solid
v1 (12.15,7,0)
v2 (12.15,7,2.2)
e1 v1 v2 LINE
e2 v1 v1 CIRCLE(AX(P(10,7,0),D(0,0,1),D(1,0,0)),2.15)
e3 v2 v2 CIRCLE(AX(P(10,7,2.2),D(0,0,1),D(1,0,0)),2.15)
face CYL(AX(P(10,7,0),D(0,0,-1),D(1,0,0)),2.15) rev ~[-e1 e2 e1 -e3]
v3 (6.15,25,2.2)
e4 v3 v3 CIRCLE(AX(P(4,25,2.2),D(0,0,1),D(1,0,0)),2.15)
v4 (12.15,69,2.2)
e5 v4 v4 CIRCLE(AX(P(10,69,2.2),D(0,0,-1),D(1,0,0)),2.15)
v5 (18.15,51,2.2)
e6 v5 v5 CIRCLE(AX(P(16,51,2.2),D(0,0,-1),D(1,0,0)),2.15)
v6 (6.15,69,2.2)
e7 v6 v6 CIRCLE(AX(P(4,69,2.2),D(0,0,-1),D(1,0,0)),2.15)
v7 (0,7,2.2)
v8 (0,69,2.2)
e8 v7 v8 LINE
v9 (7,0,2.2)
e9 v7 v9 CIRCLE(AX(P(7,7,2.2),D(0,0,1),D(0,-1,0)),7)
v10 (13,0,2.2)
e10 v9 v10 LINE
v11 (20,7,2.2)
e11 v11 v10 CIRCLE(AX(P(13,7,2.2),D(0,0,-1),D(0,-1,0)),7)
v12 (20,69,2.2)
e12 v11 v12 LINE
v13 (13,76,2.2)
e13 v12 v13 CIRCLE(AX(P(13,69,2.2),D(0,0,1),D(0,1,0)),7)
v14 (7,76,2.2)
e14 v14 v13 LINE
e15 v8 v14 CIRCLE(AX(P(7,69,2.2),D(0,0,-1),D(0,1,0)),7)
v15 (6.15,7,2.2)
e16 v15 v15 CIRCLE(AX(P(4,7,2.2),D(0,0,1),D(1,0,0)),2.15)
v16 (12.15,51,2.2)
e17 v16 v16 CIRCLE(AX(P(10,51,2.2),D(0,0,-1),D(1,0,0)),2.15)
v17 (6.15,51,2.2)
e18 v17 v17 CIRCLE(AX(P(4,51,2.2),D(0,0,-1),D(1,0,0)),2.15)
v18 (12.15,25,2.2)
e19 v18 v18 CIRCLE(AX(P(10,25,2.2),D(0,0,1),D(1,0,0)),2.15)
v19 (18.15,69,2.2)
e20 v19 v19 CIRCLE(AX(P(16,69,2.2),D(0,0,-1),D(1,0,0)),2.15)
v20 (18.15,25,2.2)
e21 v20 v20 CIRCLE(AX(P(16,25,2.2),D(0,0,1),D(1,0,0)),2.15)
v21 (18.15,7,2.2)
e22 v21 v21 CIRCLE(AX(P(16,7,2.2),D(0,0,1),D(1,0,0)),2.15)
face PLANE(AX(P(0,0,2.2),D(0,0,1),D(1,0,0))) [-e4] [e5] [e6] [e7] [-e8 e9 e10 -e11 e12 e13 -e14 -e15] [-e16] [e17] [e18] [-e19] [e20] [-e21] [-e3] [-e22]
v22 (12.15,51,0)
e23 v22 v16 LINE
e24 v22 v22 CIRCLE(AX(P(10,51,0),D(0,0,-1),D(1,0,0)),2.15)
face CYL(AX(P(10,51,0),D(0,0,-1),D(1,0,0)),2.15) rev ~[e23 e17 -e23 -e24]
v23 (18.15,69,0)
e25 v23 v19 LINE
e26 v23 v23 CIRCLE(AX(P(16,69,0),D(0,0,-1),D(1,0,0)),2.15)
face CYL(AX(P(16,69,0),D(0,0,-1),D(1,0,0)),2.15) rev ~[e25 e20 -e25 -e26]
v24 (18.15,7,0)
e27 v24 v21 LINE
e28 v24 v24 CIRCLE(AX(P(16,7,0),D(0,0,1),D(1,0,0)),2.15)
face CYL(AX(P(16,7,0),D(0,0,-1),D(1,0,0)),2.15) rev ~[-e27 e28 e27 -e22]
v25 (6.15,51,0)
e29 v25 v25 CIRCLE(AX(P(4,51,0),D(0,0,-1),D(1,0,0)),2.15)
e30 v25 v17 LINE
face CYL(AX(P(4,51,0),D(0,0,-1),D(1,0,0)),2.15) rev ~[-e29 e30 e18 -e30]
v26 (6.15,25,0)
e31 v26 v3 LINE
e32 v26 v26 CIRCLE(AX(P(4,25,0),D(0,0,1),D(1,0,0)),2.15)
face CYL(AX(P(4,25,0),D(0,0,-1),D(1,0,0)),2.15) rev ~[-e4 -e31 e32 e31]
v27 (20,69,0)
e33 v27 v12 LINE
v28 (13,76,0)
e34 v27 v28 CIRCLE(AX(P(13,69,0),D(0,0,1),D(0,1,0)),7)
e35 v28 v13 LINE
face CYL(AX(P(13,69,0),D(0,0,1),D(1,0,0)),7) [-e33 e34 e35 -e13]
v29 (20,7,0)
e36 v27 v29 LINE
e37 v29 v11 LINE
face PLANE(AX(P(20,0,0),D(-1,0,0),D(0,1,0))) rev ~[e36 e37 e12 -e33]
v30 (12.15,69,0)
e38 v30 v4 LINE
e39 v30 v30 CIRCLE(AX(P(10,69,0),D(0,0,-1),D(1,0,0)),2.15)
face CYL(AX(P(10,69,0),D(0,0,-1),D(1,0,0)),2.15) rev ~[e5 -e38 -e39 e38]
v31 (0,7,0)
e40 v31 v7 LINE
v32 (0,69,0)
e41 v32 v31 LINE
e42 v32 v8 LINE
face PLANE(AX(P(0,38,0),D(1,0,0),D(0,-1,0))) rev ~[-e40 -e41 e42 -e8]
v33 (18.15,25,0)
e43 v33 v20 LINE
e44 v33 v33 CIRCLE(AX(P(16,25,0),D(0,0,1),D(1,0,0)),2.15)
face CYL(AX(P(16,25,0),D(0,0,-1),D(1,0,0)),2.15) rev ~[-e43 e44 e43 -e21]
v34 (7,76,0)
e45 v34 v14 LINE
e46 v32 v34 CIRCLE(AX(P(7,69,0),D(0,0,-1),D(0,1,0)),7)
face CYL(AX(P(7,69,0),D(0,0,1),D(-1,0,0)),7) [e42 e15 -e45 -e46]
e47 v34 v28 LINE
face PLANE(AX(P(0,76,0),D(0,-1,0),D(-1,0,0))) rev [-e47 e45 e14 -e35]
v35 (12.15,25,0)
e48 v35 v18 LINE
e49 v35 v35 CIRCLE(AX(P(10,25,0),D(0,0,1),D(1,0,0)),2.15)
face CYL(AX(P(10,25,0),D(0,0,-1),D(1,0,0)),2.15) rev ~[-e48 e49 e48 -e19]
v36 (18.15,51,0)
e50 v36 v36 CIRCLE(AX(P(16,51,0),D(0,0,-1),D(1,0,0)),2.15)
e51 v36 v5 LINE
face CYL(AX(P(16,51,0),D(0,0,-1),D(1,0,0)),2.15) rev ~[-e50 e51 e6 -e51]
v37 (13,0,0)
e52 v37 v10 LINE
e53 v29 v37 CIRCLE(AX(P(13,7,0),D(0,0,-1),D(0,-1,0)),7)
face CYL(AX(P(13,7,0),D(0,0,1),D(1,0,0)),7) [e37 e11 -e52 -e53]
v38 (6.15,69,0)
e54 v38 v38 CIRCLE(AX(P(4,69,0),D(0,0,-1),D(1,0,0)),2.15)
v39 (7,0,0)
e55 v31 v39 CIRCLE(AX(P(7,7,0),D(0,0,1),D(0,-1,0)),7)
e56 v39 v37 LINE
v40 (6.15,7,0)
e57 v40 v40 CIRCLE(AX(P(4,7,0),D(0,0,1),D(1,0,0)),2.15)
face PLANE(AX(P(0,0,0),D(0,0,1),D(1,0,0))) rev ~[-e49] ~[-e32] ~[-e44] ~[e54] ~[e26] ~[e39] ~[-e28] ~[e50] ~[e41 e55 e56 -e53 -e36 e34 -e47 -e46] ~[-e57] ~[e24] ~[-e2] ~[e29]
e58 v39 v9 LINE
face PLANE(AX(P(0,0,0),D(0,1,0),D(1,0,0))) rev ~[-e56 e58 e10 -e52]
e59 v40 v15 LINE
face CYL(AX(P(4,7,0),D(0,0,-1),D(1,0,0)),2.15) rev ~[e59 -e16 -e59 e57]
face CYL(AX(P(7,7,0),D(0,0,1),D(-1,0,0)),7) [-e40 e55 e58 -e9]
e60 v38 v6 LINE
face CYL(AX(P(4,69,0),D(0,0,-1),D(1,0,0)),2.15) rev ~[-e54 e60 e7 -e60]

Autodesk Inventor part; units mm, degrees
ref_plane "YZ Plane" through (0, 0, 0) normal (1, 0, 0) x (0, 1, 0)
ref_plane "XZ Plane" through (0, 0, 0) normal (0, 1, 0) x (-1, 0, 0)
ref_plane "XY Plane" through (0, 0, 0) normal (0, 0, 1) x (1, 0, 0)
sketch "Esquisse12" plane through (0, 0, 0) normal (0, 0, 1) x (1, 0, 0)
  line L0 (0, 0) -> (20, 0)
  line L1 (20, 0) -> (20, 38)
  line L2 (20, 38) -> (0, 38)
  line L3 (0, 38) -> (0, 0)
  line L4 (10, 38) -> (10, 0) construction
  circle A0 centre (10, 7) radius 2.15
  line L5 (10, 7) -> (20, 7) construction
  circle A1 centre (16, 7) radius 2.15
  circle A2 centre (4, 7) radius 2.15
  circle A3 centre (10, 7) radius 2.15
  circle A4 centre (10, 25) radius 2.15
  circle A5 centre (16, 25) radius 2.15
  circle A6 centre (4, 25) radius 2.15
  dimension "d133" = 20
  dimension "d134" = 7
  dimension "d135" = 4.3
  dimension "d138" = 6
  dimension "d141" = 6
  dimension "d148" = 18
  dimension "d153" = 13
extrude "Extrusion13" add sketch "Esquisse12" along normal blind 2.2
fillet "Congé8" radius 7 2 edges at (20, 0, 1.1) (0, 0, 1.1)
mirror "Symétrie3" about plane through (20, 38, 0) normal (0, 1, 0)
equation "\"d135\" = Holes"
equation "\"d154\" = Depth"
equation "\"d156\" = Rounding"
equation "\"Depth\" = 2.2"
equation "\"Holes\" = 4.3"
equation "\"Height\" = 0"
equation "\"Rounding\" = 7"
properties part number "SideToSide"
